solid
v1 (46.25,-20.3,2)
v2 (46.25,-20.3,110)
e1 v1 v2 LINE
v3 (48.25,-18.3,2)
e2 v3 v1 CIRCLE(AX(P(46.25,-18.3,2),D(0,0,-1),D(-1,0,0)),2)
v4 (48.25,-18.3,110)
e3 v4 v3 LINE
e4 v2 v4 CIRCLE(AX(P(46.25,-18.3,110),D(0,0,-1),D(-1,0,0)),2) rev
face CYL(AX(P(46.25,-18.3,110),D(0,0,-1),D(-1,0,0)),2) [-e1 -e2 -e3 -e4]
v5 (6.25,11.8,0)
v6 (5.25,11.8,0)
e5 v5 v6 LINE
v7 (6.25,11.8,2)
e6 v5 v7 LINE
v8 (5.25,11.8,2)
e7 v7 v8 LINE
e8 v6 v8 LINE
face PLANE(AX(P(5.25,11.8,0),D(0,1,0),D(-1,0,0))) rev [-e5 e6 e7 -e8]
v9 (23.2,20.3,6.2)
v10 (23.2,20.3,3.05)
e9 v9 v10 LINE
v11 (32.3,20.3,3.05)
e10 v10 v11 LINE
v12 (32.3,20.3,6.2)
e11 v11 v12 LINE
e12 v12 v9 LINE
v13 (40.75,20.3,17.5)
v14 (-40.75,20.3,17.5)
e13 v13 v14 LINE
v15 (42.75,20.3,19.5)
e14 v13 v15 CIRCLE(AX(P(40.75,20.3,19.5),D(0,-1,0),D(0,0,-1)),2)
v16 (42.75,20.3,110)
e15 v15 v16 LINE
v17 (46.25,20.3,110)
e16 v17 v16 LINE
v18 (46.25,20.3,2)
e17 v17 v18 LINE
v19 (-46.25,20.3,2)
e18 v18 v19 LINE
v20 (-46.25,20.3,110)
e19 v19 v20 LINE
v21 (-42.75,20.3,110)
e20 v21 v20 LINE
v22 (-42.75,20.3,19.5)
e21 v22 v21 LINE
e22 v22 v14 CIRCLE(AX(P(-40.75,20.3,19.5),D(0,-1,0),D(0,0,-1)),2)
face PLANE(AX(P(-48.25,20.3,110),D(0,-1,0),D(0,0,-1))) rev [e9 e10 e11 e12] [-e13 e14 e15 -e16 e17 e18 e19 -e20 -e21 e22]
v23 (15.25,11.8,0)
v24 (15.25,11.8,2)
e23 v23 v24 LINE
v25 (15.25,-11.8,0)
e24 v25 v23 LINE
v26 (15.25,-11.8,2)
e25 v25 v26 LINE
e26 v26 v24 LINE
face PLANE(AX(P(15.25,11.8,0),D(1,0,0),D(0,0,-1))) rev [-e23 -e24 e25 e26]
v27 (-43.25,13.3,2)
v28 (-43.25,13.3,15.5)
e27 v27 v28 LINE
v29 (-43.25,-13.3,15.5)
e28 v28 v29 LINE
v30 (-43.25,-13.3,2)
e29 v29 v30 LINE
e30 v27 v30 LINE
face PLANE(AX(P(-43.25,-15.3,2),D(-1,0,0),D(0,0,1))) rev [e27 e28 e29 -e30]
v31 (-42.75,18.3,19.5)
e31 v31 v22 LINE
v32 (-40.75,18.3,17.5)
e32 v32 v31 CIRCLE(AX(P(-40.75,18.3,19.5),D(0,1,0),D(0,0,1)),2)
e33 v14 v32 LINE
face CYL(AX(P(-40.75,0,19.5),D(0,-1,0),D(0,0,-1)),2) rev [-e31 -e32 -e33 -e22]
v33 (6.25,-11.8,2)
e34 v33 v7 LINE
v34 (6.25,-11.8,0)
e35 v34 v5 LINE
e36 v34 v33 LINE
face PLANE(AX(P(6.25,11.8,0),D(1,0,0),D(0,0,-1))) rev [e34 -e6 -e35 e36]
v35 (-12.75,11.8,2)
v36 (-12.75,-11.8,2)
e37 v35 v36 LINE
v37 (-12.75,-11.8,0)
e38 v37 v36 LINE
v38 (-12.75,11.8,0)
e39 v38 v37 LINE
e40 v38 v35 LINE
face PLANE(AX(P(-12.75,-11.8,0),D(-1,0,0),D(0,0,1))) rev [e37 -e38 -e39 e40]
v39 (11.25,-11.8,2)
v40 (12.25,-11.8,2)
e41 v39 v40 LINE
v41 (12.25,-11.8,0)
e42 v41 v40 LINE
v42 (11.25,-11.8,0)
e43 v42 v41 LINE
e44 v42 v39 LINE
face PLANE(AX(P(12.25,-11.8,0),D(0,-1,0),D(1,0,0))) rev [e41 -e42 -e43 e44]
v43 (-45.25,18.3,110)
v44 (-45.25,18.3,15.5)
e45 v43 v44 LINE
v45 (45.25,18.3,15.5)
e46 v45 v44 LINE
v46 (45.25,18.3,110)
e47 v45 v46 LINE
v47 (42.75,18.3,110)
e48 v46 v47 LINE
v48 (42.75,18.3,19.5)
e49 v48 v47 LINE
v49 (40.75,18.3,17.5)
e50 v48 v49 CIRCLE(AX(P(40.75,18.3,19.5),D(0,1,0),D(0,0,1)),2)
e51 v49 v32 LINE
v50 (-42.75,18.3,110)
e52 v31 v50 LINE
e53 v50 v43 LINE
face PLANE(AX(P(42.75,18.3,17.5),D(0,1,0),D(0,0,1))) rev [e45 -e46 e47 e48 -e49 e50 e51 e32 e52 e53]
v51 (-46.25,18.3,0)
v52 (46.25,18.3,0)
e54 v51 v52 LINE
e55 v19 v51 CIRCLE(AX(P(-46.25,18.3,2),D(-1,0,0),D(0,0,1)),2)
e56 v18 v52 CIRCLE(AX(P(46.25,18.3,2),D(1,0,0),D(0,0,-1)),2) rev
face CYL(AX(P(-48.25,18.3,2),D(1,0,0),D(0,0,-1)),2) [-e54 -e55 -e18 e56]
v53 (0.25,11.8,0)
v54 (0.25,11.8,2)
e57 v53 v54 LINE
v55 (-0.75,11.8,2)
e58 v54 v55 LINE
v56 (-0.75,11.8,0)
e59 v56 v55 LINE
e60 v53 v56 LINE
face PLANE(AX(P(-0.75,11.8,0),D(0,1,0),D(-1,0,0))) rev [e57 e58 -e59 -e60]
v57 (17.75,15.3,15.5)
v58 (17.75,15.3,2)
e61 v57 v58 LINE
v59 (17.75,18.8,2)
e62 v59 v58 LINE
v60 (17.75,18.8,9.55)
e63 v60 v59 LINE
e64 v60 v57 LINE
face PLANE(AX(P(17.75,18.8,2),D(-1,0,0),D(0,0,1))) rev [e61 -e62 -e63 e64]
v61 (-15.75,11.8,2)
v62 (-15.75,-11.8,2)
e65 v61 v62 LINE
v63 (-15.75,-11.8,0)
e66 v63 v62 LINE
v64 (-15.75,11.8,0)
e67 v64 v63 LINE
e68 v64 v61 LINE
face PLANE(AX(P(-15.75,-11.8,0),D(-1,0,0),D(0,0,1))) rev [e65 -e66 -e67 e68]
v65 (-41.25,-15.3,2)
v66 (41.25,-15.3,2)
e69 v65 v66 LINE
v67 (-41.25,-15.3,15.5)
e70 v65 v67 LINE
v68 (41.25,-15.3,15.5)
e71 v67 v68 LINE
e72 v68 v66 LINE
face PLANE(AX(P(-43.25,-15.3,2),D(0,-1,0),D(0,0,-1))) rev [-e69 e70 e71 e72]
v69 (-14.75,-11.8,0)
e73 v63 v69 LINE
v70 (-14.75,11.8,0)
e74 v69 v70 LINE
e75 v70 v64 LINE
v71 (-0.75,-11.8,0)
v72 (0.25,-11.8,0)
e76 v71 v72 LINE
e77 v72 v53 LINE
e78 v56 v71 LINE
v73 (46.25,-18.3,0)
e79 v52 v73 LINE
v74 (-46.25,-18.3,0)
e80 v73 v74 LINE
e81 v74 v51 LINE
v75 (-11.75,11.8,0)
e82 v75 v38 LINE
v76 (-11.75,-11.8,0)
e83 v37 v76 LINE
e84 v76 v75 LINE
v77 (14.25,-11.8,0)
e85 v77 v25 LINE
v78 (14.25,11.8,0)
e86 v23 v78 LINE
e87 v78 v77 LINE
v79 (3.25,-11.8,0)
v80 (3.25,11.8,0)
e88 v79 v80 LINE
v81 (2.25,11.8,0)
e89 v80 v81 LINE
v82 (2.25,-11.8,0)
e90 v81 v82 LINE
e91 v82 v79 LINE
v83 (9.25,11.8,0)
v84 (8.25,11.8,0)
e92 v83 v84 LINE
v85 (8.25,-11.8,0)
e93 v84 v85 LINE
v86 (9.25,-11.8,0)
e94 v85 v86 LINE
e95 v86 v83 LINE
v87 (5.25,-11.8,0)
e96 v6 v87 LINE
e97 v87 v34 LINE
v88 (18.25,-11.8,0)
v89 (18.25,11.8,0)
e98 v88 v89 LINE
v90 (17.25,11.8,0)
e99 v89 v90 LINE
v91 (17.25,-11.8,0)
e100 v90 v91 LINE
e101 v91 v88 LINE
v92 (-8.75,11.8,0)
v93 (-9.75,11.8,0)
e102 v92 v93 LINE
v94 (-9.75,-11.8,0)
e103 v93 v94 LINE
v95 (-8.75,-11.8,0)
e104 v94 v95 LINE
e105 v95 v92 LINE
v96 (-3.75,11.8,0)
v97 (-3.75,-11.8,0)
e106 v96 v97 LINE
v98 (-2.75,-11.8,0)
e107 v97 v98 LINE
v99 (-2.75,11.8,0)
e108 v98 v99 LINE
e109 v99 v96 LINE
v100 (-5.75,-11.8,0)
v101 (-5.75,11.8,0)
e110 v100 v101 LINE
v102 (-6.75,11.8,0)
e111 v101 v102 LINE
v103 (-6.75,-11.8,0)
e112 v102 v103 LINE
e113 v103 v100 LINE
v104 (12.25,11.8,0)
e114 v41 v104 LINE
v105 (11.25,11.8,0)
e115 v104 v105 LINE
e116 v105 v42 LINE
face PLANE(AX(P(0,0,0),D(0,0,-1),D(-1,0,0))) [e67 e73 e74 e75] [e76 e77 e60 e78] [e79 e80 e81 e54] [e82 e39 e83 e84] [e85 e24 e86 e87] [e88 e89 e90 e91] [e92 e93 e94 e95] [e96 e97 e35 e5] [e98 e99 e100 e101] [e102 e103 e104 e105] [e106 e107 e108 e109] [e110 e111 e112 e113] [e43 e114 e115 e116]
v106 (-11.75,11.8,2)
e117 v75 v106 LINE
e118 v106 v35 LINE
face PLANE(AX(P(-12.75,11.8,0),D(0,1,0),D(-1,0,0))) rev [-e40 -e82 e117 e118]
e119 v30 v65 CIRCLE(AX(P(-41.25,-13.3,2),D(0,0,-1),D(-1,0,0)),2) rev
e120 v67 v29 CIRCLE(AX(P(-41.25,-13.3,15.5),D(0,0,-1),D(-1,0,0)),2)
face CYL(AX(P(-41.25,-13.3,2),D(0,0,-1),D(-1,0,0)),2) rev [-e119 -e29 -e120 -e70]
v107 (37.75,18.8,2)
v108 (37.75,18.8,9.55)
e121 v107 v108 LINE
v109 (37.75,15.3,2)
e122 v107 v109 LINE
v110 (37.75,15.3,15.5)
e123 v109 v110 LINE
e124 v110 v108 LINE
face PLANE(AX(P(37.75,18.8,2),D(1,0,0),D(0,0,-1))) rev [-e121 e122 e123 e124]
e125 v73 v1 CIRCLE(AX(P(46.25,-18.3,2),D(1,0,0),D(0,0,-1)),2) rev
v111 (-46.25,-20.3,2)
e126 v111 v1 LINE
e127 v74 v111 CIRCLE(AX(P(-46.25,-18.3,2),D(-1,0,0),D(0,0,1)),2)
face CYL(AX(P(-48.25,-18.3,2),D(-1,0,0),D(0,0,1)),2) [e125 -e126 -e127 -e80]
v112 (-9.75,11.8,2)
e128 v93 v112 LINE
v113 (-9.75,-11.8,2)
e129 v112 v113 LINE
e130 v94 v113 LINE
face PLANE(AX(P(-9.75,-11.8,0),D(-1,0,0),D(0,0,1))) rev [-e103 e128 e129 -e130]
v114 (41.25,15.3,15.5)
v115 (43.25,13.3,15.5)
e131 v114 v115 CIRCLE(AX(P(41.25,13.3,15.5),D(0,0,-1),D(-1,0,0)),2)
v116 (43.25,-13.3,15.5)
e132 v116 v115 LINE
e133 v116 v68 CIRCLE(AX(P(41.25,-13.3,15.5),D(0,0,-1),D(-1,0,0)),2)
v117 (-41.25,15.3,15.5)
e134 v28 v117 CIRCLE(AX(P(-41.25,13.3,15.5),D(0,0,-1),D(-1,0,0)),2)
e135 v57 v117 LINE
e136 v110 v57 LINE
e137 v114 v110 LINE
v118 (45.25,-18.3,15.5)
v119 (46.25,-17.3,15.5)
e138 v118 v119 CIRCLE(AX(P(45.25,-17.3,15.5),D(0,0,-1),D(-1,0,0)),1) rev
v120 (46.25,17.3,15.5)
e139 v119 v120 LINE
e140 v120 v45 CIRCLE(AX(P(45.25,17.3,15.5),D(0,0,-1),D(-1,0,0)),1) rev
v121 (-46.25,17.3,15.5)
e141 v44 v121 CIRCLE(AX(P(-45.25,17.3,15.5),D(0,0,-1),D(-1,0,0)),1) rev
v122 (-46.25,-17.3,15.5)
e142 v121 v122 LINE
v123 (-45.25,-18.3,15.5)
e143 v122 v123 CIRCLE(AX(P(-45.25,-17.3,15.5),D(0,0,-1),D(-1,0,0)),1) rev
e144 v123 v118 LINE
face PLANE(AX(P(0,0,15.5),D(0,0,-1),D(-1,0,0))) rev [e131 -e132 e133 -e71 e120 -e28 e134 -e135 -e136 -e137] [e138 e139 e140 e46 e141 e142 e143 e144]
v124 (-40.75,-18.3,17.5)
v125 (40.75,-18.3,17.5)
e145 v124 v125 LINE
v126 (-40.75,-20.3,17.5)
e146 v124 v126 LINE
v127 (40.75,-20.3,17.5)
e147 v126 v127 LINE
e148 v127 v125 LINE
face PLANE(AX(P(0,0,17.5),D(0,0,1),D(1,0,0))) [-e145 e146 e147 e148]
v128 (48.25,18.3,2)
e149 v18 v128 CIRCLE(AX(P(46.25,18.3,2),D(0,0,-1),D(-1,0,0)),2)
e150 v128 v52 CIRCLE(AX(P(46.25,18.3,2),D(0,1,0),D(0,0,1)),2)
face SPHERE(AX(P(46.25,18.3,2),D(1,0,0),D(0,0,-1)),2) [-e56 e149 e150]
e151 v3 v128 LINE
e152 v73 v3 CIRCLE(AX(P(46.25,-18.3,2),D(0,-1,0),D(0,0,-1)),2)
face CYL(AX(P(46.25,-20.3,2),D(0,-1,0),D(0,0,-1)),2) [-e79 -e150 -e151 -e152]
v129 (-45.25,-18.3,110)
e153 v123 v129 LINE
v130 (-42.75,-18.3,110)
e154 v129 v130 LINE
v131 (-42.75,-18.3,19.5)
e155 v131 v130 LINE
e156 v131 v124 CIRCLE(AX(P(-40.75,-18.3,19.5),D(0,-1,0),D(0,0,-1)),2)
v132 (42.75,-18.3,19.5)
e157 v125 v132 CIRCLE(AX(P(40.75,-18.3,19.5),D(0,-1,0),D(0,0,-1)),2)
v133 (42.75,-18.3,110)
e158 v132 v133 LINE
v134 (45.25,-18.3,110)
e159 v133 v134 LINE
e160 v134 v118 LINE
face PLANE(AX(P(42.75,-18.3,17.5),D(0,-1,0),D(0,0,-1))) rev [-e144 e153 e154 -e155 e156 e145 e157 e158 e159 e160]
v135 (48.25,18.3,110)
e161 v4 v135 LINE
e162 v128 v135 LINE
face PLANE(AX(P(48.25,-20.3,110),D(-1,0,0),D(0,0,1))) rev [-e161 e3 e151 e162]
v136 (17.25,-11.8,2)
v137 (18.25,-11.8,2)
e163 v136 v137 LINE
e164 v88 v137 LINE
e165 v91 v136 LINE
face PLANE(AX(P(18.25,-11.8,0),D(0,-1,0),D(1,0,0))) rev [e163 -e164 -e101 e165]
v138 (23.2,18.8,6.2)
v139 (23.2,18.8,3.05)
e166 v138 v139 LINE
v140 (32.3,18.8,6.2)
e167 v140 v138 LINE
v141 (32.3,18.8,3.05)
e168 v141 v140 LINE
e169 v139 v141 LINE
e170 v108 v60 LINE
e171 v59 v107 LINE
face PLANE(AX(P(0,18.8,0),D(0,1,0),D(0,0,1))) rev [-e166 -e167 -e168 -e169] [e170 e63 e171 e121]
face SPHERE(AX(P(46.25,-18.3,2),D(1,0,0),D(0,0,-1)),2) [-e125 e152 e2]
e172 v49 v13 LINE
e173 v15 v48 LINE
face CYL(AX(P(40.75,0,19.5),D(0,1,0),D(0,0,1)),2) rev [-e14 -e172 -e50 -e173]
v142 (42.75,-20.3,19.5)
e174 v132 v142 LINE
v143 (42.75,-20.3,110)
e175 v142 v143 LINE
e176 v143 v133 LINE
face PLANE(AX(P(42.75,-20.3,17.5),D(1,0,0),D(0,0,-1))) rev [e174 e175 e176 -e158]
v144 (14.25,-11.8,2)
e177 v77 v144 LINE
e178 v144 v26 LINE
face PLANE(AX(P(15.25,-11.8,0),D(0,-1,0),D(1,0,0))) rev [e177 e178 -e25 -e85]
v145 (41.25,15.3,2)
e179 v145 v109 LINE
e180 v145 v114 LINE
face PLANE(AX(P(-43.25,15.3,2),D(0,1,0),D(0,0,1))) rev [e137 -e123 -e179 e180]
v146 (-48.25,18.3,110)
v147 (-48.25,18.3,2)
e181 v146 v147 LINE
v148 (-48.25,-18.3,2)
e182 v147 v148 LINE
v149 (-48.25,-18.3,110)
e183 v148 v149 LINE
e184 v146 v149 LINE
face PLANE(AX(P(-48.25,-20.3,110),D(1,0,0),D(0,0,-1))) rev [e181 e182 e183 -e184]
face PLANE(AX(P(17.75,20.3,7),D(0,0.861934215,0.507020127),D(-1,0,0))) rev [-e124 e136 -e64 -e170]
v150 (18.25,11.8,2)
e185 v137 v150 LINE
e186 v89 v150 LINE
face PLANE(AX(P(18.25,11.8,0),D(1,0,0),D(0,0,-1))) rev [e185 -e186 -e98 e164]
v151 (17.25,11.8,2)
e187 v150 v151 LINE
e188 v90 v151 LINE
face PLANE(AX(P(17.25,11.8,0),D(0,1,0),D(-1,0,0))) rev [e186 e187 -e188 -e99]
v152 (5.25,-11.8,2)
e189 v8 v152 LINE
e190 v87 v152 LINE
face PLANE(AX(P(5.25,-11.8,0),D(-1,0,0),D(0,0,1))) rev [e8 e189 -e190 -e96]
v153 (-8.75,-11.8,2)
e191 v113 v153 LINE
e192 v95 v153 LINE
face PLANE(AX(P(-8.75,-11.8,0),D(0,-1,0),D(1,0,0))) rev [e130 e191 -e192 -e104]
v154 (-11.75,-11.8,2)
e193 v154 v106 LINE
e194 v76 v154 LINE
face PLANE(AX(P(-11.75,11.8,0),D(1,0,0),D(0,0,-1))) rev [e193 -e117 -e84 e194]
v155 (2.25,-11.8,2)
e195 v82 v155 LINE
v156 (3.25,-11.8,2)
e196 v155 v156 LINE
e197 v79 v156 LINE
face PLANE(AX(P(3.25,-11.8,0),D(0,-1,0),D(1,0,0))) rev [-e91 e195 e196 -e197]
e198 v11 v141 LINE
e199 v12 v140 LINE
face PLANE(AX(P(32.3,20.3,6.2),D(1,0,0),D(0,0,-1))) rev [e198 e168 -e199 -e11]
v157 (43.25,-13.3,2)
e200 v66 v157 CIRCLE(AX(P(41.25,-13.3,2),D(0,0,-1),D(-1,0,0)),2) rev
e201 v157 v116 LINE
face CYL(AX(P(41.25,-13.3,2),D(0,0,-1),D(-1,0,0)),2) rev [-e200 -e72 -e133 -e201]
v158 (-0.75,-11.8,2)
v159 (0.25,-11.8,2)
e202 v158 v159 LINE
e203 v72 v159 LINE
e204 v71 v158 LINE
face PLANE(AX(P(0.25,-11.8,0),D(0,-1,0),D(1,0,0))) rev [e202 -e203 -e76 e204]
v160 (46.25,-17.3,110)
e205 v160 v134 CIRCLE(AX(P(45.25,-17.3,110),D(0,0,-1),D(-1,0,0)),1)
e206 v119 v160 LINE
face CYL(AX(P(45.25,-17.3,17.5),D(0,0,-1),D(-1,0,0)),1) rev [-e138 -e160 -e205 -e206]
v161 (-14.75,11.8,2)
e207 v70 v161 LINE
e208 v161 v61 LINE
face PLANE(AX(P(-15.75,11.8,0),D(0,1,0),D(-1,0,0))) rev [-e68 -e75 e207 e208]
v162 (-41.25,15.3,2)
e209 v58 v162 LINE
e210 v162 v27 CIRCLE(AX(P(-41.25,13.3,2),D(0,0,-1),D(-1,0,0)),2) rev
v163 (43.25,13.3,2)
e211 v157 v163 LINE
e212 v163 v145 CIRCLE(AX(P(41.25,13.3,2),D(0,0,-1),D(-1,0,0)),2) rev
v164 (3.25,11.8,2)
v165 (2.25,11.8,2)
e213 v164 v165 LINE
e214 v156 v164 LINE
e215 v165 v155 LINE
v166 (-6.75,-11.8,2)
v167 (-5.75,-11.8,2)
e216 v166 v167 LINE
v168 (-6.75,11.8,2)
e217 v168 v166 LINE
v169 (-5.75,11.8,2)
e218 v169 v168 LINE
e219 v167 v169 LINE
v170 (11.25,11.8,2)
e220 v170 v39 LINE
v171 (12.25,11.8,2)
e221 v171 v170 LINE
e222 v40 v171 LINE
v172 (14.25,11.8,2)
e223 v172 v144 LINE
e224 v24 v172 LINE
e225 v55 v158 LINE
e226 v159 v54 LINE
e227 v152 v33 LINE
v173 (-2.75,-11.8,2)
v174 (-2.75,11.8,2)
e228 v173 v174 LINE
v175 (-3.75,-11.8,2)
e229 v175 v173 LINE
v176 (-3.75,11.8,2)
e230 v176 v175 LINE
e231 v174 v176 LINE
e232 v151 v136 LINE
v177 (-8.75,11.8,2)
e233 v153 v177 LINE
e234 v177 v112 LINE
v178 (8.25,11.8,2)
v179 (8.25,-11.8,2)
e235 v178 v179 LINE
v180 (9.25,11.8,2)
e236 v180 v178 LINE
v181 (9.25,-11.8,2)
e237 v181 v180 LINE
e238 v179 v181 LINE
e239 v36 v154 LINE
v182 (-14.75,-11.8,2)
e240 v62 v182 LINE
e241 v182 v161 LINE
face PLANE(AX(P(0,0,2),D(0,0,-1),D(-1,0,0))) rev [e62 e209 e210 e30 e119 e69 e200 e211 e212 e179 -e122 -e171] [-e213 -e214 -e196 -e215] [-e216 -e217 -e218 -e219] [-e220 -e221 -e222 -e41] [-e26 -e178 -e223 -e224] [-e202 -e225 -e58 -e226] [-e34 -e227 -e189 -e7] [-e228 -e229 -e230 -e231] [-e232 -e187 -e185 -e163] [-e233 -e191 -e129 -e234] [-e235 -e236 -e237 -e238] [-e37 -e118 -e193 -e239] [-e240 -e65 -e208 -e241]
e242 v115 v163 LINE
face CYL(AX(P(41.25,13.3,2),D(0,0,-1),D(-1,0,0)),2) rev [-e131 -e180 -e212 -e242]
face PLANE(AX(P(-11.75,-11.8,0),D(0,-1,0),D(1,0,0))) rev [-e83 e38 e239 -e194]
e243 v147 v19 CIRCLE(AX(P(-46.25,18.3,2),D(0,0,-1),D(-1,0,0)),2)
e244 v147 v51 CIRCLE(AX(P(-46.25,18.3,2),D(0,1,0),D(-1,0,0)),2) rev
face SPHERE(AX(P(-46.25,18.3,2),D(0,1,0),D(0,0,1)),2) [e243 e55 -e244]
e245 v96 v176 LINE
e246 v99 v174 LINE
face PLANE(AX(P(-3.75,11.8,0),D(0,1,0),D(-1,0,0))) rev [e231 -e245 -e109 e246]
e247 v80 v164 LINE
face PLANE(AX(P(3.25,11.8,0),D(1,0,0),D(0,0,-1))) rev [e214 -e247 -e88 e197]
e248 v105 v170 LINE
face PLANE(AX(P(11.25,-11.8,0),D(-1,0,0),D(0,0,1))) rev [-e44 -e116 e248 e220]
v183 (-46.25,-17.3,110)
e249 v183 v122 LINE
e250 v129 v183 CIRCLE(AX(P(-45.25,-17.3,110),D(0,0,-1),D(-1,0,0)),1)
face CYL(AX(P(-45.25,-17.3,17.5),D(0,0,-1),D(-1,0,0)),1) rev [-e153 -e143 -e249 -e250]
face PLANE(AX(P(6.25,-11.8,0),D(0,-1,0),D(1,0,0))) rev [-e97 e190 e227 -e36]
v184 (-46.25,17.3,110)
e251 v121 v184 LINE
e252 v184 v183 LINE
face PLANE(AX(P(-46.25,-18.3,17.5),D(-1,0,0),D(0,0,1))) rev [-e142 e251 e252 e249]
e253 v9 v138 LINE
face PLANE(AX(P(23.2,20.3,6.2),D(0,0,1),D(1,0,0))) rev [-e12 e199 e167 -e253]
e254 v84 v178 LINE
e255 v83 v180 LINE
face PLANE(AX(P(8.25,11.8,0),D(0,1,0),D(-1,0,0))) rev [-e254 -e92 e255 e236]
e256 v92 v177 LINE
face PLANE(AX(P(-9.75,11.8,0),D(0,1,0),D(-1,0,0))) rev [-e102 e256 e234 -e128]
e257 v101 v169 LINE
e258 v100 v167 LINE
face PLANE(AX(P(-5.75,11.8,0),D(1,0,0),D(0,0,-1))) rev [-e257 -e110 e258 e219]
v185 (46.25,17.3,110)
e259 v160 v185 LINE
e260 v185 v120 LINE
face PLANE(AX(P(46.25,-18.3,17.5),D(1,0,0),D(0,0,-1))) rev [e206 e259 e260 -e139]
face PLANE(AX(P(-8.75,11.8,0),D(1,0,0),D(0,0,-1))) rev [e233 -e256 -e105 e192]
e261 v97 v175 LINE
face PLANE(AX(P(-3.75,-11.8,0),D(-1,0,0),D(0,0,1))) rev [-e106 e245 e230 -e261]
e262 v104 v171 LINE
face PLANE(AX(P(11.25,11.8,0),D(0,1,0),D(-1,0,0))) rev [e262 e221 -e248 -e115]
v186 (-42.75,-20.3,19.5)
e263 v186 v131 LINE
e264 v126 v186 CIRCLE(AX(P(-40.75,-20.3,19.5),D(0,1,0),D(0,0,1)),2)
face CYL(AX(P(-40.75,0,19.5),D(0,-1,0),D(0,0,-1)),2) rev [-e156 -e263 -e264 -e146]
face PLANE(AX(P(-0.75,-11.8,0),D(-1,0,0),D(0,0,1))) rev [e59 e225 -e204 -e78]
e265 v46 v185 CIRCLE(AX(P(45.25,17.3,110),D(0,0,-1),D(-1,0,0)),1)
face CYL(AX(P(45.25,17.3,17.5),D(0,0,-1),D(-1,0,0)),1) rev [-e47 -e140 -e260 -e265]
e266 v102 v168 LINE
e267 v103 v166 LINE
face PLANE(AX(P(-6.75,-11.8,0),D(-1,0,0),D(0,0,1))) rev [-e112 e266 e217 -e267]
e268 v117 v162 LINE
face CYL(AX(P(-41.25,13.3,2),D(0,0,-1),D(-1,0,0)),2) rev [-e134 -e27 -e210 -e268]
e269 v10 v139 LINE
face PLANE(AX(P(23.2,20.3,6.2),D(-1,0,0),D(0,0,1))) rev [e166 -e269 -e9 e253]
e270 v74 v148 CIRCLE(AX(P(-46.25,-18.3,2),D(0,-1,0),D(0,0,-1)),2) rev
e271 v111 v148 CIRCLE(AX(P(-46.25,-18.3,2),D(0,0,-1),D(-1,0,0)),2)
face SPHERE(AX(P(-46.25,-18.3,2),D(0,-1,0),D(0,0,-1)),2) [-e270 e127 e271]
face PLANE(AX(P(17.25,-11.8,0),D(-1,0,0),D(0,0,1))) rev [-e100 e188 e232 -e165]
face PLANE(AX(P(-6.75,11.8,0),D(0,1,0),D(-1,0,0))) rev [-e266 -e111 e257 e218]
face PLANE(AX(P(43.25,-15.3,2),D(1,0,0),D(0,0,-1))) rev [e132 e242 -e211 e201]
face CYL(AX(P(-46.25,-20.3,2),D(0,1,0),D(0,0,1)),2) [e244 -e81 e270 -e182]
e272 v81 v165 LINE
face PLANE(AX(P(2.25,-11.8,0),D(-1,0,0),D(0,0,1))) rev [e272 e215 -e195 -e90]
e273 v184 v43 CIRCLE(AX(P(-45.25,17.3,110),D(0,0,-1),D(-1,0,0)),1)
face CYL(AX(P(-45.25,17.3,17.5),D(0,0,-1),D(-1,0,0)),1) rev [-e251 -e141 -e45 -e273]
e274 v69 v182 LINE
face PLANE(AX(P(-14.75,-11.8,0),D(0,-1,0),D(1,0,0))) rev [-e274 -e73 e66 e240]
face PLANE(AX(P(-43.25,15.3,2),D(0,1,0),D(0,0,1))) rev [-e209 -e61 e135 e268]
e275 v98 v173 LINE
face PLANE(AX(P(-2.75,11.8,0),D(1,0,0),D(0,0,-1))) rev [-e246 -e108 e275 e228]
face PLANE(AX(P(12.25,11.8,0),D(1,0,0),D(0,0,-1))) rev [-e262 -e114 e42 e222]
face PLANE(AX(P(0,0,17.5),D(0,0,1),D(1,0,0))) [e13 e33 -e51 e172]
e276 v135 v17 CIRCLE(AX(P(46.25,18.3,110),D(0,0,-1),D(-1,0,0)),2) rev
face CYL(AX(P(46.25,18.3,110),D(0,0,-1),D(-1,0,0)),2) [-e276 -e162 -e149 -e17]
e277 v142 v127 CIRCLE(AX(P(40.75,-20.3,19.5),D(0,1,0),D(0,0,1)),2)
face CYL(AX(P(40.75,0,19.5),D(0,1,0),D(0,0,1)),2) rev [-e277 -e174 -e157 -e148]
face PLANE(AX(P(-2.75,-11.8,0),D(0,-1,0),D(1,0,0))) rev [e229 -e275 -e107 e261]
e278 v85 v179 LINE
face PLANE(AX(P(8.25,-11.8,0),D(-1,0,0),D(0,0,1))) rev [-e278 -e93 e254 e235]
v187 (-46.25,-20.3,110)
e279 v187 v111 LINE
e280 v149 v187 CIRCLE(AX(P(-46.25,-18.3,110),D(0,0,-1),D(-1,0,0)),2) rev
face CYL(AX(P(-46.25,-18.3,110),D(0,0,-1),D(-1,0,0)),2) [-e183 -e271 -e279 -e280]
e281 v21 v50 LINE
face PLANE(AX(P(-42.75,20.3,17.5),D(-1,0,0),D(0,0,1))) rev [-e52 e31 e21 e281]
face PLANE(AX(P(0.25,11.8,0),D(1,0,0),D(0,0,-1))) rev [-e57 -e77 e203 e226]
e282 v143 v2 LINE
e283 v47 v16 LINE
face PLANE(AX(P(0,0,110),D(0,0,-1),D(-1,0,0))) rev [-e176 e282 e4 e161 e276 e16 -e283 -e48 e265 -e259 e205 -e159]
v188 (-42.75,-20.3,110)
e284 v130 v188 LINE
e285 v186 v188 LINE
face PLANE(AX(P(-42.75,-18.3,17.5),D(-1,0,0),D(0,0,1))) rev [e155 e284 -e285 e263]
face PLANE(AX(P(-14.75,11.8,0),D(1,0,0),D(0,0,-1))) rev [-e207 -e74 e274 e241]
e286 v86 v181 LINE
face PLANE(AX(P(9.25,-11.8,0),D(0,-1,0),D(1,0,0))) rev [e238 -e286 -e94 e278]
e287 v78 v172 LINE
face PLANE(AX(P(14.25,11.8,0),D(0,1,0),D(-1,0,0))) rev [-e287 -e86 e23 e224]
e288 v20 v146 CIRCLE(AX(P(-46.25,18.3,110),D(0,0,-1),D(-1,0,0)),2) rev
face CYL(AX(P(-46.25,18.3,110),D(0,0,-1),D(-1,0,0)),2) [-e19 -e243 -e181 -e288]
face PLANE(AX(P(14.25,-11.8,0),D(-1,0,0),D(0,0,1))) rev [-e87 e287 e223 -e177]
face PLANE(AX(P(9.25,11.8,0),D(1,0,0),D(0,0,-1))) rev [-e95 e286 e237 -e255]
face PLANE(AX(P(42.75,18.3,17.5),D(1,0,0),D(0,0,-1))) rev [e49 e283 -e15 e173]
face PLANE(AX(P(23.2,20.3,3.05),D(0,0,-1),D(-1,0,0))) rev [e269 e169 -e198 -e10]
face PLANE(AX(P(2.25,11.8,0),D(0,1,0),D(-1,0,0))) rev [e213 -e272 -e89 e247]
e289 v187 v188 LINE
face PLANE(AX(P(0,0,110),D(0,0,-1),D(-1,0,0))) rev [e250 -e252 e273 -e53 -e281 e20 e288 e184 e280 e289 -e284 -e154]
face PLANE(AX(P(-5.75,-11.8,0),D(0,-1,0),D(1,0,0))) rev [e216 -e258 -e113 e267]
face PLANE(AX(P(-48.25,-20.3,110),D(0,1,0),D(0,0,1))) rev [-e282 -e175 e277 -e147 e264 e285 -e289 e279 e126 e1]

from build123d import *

# Parameters (mm, degrees)
IZIM1_W                     = 96.5
IZIM1_H                     = 40.6
Y_KSEKLIK_EKSTR_ZYON1_DEPTH = 110
KES_EKSTR_ZYON1_DEPTH       = 92.5
IZIM3_W                     = 92.5
IZIM3_H                     = 36.6
KES_EKSTR_ZYON2_DEPTH       = 2
IZIM4_W                     = 86.5
IZIM4_H                     = 30.6
KES_EKSTR_ZYON3_DEPTH       = 13.5
RADYUS1_R                   = 2
RADYUS2_R                   = 1
IZIM5_W                     = 20
IZIM5_H                     = 5
KES_EKSTR_ZYON4_DEPTH       = 3.5
IZIM6_W                     = 9.1
IZIM6_H                     = 3.15
KES_EKSTR_ZYON5_DEPTH       = 1.5
IZIM7_W                     = 1
IZIM7_H                     = 23.6
KES_EKSTR_ZYON6_DEPTH       = 2


with BuildPart() as part:
    # Çizim1 → Yükseklik-Ekstrüzyon1 (new body)
    with BuildSketch(Plane.XY):
        Rectangle(IZIM1_W, IZIM1_H)
    extrude(amount=Y_KSEKLIK_EKSTR_ZYON1_DEPTH)

    # Çizim2 → Kes-Ekstrüzyon1 (cut)
    with BuildSketch(Plane.XY.offset(110)):
        Polygon((-46.25, -18.3), (-42.75, -18.3), (-42.75, -20.3), (42.75, -20.3), (42.75, -18.3), (46.25, -18.3), (46.25, 18.3), (42.75, 18.3), (42.75, 20.3), (-42.75, 20.3), (-42.75, 18.3), (-46.25, 18.3), align=None)
    extrude(amount=-KES_EKSTR_ZYON1_DEPTH, mode=Mode.SUBTRACT)

    # Çizim3 → Kes-Ekstrüzyon2 (cut)
    with BuildSketch(Plane.XY.offset(17.5)):
        Rectangle(IZIM3_W, IZIM3_H)
    extrude(amount=-KES_EKSTR_ZYON2_DEPTH, mode=Mode.SUBTRACT)

    # Çizim4 → Kes-Ekstrüzyon3 (cut)
    with BuildSketch(Plane.XY.offset(15.5)):
        Rectangle(IZIM4_W, IZIM4_H)
    extrude(amount=-KES_EKSTR_ZYON3_DEPTH, mode=Mode.SUBTRACT)

    # Radyus1
    radyus1_edges = [part.edges().sort_by_distance(p)[0] for p in [
        (42.75, -19.3, 17.5),
        (-42.75, -19.3, 17.5),
        (-42.75, 19.3, 17.5),
        (42.75, 19.3, 17.5),
        (0, -20.3, 0),
        (-48.25, 0, 0),
        (0, 20.3, 0),
        (48.25, 0, 0),
        (43.25, 15.3, 8.75),
        (43.25, -15.3, 8.75),
        (-43.25, -15.3, 8.75),
        (-43.25, 15.3, 8.75),
        (48.25, -20.3, 55),
        (-48.25, -20.3, 55),
        (-48.25, 20.3, 55),
        (48.25, 20.3, 55),
    ]]
    fillet(radyus1_edges, radius=RADYUS1_R)

    # Radyus2
    radyus2_edges = [part.edges().sort_by_distance(p)[0] for p in [
        (46.25, 18.3, 62.75),
        (46.25, -18.3, 62.75),
        (-46.25, -18.3, 62.75),
        (-46.25, 18.3, 62.75),
    ]]
    fillet(radyus2_edges, radius=RADYUS2_R)

    # Çizim5 → Kes-Ekstrüzyon4 (cut)
    with BuildSketch(Plane.XZ.offset(-15.3)):
        with Locations((27.75, 4.5)):
            Rectangle(IZIM5_W, IZIM5_H)
    extrude(amount=-KES_EKSTR_ZYON4_DEPTH, mode=Mode.SUBTRACT)

    # Pah3
    # the kernel refuses this chamfer: 8.5, 5 mm, written as the material it takes off along each edge
    with BuildSketch(Plane(origin=(37.75, 15.3, 7), x_dir=(0, -0.01960111388009259, 0.9998078797122274), z_dir=(-1, 0, 0))) as pah3_piece_1_section:
        with BuildLine():
            Line((8.794747283, 0), (-0.394385874, 5.165648867))
            Line((-0.394385874, 5.165648867), (-0.564353214, 5.162316677))
            ThreePointArc((-0.564353214, 5.162316677), (-0.220659611, 2.582364372), (-0.16996734, -0.003332189))
            Line((-0.16996734, -0.003332189), (0.003332189, -0.16996734))
            ThreePointArc((0.003332189, -0.16996734), (4.399016344, -0.083790478), (8.798079472, -0.16996734))
            Line((8.798079472, -0.16996734), (8.794747283, 0))
        make_face()
    pah3_piece_1 = extrude(amount=20, mode=Mode.PRIVATE)
    pah3_piece_1 = split(pah3_piece_1, bisect_by=Plane(origin=(27.75, 18.8, 10.101795291), z_dir=(0, -1, 0)), keep=Keep.TOP, mode=Mode.PRIVATE)
    add(pah3_piece_1, mode=Mode.SUBTRACT)

    # Çizim6 → Kes-Ekstrüzyon5 (cut)
    with BuildSketch(Plane.XZ.offset(-18.8)):
        with Locations((27.75, 4.625)):
            Rectangle(IZIM6_W, IZIM6_H)
    extrude(amount=-KES_EKSTR_ZYON5_DEPTH, mode=Mode.SUBTRACT)

    # Çizim7 → Kes-Ekstrüzyon6 (cut)
    with BuildSketch(Plane.XY.offset(2)):
        with Locations((17.75, 0)):
            Rectangle(IZIM7_W, IZIM7_H)
        with Locations((14.75, 0)):
            Rectangle(IZIM7_W, IZIM7_H)
        with Locations((11.75, 0)):
            Rectangle(IZIM7_W, IZIM7_H)
        with Locations((8.75, 0)):
            Rectangle(IZIM7_W, IZIM7_H)
        with Locations((5.75, 0)):
            Rectangle(IZIM7_W, IZIM7_H)
        with Locations((2.75, 0)):
            Rectangle(IZIM7_W, IZIM7_H)
        with Locations((-0.25, 0)):
            Rectangle(IZIM7_W, IZIM7_H)
        with Locations((-3.25, 0)):
            Rectangle(IZIM7_W, IZIM7_H)
        with Locations((-6.25, 0)):
            Rectangle(IZIM7_W, IZIM7_H)
        with Locations((-9.25, 0)):
            Rectangle(IZIM7_W, IZIM7_H)
        with Locations((-12.25, 0)):
            Rectangle(IZIM7_W, IZIM7_H)
        with Locations((-15.25, 0)):
            Rectangle(IZIM7_W, IZIM7_H)
    extrude(amount=-KES_EKSTR_ZYON6_DEPTH, mode=Mode.SUBTRACT)


solid = part.part
